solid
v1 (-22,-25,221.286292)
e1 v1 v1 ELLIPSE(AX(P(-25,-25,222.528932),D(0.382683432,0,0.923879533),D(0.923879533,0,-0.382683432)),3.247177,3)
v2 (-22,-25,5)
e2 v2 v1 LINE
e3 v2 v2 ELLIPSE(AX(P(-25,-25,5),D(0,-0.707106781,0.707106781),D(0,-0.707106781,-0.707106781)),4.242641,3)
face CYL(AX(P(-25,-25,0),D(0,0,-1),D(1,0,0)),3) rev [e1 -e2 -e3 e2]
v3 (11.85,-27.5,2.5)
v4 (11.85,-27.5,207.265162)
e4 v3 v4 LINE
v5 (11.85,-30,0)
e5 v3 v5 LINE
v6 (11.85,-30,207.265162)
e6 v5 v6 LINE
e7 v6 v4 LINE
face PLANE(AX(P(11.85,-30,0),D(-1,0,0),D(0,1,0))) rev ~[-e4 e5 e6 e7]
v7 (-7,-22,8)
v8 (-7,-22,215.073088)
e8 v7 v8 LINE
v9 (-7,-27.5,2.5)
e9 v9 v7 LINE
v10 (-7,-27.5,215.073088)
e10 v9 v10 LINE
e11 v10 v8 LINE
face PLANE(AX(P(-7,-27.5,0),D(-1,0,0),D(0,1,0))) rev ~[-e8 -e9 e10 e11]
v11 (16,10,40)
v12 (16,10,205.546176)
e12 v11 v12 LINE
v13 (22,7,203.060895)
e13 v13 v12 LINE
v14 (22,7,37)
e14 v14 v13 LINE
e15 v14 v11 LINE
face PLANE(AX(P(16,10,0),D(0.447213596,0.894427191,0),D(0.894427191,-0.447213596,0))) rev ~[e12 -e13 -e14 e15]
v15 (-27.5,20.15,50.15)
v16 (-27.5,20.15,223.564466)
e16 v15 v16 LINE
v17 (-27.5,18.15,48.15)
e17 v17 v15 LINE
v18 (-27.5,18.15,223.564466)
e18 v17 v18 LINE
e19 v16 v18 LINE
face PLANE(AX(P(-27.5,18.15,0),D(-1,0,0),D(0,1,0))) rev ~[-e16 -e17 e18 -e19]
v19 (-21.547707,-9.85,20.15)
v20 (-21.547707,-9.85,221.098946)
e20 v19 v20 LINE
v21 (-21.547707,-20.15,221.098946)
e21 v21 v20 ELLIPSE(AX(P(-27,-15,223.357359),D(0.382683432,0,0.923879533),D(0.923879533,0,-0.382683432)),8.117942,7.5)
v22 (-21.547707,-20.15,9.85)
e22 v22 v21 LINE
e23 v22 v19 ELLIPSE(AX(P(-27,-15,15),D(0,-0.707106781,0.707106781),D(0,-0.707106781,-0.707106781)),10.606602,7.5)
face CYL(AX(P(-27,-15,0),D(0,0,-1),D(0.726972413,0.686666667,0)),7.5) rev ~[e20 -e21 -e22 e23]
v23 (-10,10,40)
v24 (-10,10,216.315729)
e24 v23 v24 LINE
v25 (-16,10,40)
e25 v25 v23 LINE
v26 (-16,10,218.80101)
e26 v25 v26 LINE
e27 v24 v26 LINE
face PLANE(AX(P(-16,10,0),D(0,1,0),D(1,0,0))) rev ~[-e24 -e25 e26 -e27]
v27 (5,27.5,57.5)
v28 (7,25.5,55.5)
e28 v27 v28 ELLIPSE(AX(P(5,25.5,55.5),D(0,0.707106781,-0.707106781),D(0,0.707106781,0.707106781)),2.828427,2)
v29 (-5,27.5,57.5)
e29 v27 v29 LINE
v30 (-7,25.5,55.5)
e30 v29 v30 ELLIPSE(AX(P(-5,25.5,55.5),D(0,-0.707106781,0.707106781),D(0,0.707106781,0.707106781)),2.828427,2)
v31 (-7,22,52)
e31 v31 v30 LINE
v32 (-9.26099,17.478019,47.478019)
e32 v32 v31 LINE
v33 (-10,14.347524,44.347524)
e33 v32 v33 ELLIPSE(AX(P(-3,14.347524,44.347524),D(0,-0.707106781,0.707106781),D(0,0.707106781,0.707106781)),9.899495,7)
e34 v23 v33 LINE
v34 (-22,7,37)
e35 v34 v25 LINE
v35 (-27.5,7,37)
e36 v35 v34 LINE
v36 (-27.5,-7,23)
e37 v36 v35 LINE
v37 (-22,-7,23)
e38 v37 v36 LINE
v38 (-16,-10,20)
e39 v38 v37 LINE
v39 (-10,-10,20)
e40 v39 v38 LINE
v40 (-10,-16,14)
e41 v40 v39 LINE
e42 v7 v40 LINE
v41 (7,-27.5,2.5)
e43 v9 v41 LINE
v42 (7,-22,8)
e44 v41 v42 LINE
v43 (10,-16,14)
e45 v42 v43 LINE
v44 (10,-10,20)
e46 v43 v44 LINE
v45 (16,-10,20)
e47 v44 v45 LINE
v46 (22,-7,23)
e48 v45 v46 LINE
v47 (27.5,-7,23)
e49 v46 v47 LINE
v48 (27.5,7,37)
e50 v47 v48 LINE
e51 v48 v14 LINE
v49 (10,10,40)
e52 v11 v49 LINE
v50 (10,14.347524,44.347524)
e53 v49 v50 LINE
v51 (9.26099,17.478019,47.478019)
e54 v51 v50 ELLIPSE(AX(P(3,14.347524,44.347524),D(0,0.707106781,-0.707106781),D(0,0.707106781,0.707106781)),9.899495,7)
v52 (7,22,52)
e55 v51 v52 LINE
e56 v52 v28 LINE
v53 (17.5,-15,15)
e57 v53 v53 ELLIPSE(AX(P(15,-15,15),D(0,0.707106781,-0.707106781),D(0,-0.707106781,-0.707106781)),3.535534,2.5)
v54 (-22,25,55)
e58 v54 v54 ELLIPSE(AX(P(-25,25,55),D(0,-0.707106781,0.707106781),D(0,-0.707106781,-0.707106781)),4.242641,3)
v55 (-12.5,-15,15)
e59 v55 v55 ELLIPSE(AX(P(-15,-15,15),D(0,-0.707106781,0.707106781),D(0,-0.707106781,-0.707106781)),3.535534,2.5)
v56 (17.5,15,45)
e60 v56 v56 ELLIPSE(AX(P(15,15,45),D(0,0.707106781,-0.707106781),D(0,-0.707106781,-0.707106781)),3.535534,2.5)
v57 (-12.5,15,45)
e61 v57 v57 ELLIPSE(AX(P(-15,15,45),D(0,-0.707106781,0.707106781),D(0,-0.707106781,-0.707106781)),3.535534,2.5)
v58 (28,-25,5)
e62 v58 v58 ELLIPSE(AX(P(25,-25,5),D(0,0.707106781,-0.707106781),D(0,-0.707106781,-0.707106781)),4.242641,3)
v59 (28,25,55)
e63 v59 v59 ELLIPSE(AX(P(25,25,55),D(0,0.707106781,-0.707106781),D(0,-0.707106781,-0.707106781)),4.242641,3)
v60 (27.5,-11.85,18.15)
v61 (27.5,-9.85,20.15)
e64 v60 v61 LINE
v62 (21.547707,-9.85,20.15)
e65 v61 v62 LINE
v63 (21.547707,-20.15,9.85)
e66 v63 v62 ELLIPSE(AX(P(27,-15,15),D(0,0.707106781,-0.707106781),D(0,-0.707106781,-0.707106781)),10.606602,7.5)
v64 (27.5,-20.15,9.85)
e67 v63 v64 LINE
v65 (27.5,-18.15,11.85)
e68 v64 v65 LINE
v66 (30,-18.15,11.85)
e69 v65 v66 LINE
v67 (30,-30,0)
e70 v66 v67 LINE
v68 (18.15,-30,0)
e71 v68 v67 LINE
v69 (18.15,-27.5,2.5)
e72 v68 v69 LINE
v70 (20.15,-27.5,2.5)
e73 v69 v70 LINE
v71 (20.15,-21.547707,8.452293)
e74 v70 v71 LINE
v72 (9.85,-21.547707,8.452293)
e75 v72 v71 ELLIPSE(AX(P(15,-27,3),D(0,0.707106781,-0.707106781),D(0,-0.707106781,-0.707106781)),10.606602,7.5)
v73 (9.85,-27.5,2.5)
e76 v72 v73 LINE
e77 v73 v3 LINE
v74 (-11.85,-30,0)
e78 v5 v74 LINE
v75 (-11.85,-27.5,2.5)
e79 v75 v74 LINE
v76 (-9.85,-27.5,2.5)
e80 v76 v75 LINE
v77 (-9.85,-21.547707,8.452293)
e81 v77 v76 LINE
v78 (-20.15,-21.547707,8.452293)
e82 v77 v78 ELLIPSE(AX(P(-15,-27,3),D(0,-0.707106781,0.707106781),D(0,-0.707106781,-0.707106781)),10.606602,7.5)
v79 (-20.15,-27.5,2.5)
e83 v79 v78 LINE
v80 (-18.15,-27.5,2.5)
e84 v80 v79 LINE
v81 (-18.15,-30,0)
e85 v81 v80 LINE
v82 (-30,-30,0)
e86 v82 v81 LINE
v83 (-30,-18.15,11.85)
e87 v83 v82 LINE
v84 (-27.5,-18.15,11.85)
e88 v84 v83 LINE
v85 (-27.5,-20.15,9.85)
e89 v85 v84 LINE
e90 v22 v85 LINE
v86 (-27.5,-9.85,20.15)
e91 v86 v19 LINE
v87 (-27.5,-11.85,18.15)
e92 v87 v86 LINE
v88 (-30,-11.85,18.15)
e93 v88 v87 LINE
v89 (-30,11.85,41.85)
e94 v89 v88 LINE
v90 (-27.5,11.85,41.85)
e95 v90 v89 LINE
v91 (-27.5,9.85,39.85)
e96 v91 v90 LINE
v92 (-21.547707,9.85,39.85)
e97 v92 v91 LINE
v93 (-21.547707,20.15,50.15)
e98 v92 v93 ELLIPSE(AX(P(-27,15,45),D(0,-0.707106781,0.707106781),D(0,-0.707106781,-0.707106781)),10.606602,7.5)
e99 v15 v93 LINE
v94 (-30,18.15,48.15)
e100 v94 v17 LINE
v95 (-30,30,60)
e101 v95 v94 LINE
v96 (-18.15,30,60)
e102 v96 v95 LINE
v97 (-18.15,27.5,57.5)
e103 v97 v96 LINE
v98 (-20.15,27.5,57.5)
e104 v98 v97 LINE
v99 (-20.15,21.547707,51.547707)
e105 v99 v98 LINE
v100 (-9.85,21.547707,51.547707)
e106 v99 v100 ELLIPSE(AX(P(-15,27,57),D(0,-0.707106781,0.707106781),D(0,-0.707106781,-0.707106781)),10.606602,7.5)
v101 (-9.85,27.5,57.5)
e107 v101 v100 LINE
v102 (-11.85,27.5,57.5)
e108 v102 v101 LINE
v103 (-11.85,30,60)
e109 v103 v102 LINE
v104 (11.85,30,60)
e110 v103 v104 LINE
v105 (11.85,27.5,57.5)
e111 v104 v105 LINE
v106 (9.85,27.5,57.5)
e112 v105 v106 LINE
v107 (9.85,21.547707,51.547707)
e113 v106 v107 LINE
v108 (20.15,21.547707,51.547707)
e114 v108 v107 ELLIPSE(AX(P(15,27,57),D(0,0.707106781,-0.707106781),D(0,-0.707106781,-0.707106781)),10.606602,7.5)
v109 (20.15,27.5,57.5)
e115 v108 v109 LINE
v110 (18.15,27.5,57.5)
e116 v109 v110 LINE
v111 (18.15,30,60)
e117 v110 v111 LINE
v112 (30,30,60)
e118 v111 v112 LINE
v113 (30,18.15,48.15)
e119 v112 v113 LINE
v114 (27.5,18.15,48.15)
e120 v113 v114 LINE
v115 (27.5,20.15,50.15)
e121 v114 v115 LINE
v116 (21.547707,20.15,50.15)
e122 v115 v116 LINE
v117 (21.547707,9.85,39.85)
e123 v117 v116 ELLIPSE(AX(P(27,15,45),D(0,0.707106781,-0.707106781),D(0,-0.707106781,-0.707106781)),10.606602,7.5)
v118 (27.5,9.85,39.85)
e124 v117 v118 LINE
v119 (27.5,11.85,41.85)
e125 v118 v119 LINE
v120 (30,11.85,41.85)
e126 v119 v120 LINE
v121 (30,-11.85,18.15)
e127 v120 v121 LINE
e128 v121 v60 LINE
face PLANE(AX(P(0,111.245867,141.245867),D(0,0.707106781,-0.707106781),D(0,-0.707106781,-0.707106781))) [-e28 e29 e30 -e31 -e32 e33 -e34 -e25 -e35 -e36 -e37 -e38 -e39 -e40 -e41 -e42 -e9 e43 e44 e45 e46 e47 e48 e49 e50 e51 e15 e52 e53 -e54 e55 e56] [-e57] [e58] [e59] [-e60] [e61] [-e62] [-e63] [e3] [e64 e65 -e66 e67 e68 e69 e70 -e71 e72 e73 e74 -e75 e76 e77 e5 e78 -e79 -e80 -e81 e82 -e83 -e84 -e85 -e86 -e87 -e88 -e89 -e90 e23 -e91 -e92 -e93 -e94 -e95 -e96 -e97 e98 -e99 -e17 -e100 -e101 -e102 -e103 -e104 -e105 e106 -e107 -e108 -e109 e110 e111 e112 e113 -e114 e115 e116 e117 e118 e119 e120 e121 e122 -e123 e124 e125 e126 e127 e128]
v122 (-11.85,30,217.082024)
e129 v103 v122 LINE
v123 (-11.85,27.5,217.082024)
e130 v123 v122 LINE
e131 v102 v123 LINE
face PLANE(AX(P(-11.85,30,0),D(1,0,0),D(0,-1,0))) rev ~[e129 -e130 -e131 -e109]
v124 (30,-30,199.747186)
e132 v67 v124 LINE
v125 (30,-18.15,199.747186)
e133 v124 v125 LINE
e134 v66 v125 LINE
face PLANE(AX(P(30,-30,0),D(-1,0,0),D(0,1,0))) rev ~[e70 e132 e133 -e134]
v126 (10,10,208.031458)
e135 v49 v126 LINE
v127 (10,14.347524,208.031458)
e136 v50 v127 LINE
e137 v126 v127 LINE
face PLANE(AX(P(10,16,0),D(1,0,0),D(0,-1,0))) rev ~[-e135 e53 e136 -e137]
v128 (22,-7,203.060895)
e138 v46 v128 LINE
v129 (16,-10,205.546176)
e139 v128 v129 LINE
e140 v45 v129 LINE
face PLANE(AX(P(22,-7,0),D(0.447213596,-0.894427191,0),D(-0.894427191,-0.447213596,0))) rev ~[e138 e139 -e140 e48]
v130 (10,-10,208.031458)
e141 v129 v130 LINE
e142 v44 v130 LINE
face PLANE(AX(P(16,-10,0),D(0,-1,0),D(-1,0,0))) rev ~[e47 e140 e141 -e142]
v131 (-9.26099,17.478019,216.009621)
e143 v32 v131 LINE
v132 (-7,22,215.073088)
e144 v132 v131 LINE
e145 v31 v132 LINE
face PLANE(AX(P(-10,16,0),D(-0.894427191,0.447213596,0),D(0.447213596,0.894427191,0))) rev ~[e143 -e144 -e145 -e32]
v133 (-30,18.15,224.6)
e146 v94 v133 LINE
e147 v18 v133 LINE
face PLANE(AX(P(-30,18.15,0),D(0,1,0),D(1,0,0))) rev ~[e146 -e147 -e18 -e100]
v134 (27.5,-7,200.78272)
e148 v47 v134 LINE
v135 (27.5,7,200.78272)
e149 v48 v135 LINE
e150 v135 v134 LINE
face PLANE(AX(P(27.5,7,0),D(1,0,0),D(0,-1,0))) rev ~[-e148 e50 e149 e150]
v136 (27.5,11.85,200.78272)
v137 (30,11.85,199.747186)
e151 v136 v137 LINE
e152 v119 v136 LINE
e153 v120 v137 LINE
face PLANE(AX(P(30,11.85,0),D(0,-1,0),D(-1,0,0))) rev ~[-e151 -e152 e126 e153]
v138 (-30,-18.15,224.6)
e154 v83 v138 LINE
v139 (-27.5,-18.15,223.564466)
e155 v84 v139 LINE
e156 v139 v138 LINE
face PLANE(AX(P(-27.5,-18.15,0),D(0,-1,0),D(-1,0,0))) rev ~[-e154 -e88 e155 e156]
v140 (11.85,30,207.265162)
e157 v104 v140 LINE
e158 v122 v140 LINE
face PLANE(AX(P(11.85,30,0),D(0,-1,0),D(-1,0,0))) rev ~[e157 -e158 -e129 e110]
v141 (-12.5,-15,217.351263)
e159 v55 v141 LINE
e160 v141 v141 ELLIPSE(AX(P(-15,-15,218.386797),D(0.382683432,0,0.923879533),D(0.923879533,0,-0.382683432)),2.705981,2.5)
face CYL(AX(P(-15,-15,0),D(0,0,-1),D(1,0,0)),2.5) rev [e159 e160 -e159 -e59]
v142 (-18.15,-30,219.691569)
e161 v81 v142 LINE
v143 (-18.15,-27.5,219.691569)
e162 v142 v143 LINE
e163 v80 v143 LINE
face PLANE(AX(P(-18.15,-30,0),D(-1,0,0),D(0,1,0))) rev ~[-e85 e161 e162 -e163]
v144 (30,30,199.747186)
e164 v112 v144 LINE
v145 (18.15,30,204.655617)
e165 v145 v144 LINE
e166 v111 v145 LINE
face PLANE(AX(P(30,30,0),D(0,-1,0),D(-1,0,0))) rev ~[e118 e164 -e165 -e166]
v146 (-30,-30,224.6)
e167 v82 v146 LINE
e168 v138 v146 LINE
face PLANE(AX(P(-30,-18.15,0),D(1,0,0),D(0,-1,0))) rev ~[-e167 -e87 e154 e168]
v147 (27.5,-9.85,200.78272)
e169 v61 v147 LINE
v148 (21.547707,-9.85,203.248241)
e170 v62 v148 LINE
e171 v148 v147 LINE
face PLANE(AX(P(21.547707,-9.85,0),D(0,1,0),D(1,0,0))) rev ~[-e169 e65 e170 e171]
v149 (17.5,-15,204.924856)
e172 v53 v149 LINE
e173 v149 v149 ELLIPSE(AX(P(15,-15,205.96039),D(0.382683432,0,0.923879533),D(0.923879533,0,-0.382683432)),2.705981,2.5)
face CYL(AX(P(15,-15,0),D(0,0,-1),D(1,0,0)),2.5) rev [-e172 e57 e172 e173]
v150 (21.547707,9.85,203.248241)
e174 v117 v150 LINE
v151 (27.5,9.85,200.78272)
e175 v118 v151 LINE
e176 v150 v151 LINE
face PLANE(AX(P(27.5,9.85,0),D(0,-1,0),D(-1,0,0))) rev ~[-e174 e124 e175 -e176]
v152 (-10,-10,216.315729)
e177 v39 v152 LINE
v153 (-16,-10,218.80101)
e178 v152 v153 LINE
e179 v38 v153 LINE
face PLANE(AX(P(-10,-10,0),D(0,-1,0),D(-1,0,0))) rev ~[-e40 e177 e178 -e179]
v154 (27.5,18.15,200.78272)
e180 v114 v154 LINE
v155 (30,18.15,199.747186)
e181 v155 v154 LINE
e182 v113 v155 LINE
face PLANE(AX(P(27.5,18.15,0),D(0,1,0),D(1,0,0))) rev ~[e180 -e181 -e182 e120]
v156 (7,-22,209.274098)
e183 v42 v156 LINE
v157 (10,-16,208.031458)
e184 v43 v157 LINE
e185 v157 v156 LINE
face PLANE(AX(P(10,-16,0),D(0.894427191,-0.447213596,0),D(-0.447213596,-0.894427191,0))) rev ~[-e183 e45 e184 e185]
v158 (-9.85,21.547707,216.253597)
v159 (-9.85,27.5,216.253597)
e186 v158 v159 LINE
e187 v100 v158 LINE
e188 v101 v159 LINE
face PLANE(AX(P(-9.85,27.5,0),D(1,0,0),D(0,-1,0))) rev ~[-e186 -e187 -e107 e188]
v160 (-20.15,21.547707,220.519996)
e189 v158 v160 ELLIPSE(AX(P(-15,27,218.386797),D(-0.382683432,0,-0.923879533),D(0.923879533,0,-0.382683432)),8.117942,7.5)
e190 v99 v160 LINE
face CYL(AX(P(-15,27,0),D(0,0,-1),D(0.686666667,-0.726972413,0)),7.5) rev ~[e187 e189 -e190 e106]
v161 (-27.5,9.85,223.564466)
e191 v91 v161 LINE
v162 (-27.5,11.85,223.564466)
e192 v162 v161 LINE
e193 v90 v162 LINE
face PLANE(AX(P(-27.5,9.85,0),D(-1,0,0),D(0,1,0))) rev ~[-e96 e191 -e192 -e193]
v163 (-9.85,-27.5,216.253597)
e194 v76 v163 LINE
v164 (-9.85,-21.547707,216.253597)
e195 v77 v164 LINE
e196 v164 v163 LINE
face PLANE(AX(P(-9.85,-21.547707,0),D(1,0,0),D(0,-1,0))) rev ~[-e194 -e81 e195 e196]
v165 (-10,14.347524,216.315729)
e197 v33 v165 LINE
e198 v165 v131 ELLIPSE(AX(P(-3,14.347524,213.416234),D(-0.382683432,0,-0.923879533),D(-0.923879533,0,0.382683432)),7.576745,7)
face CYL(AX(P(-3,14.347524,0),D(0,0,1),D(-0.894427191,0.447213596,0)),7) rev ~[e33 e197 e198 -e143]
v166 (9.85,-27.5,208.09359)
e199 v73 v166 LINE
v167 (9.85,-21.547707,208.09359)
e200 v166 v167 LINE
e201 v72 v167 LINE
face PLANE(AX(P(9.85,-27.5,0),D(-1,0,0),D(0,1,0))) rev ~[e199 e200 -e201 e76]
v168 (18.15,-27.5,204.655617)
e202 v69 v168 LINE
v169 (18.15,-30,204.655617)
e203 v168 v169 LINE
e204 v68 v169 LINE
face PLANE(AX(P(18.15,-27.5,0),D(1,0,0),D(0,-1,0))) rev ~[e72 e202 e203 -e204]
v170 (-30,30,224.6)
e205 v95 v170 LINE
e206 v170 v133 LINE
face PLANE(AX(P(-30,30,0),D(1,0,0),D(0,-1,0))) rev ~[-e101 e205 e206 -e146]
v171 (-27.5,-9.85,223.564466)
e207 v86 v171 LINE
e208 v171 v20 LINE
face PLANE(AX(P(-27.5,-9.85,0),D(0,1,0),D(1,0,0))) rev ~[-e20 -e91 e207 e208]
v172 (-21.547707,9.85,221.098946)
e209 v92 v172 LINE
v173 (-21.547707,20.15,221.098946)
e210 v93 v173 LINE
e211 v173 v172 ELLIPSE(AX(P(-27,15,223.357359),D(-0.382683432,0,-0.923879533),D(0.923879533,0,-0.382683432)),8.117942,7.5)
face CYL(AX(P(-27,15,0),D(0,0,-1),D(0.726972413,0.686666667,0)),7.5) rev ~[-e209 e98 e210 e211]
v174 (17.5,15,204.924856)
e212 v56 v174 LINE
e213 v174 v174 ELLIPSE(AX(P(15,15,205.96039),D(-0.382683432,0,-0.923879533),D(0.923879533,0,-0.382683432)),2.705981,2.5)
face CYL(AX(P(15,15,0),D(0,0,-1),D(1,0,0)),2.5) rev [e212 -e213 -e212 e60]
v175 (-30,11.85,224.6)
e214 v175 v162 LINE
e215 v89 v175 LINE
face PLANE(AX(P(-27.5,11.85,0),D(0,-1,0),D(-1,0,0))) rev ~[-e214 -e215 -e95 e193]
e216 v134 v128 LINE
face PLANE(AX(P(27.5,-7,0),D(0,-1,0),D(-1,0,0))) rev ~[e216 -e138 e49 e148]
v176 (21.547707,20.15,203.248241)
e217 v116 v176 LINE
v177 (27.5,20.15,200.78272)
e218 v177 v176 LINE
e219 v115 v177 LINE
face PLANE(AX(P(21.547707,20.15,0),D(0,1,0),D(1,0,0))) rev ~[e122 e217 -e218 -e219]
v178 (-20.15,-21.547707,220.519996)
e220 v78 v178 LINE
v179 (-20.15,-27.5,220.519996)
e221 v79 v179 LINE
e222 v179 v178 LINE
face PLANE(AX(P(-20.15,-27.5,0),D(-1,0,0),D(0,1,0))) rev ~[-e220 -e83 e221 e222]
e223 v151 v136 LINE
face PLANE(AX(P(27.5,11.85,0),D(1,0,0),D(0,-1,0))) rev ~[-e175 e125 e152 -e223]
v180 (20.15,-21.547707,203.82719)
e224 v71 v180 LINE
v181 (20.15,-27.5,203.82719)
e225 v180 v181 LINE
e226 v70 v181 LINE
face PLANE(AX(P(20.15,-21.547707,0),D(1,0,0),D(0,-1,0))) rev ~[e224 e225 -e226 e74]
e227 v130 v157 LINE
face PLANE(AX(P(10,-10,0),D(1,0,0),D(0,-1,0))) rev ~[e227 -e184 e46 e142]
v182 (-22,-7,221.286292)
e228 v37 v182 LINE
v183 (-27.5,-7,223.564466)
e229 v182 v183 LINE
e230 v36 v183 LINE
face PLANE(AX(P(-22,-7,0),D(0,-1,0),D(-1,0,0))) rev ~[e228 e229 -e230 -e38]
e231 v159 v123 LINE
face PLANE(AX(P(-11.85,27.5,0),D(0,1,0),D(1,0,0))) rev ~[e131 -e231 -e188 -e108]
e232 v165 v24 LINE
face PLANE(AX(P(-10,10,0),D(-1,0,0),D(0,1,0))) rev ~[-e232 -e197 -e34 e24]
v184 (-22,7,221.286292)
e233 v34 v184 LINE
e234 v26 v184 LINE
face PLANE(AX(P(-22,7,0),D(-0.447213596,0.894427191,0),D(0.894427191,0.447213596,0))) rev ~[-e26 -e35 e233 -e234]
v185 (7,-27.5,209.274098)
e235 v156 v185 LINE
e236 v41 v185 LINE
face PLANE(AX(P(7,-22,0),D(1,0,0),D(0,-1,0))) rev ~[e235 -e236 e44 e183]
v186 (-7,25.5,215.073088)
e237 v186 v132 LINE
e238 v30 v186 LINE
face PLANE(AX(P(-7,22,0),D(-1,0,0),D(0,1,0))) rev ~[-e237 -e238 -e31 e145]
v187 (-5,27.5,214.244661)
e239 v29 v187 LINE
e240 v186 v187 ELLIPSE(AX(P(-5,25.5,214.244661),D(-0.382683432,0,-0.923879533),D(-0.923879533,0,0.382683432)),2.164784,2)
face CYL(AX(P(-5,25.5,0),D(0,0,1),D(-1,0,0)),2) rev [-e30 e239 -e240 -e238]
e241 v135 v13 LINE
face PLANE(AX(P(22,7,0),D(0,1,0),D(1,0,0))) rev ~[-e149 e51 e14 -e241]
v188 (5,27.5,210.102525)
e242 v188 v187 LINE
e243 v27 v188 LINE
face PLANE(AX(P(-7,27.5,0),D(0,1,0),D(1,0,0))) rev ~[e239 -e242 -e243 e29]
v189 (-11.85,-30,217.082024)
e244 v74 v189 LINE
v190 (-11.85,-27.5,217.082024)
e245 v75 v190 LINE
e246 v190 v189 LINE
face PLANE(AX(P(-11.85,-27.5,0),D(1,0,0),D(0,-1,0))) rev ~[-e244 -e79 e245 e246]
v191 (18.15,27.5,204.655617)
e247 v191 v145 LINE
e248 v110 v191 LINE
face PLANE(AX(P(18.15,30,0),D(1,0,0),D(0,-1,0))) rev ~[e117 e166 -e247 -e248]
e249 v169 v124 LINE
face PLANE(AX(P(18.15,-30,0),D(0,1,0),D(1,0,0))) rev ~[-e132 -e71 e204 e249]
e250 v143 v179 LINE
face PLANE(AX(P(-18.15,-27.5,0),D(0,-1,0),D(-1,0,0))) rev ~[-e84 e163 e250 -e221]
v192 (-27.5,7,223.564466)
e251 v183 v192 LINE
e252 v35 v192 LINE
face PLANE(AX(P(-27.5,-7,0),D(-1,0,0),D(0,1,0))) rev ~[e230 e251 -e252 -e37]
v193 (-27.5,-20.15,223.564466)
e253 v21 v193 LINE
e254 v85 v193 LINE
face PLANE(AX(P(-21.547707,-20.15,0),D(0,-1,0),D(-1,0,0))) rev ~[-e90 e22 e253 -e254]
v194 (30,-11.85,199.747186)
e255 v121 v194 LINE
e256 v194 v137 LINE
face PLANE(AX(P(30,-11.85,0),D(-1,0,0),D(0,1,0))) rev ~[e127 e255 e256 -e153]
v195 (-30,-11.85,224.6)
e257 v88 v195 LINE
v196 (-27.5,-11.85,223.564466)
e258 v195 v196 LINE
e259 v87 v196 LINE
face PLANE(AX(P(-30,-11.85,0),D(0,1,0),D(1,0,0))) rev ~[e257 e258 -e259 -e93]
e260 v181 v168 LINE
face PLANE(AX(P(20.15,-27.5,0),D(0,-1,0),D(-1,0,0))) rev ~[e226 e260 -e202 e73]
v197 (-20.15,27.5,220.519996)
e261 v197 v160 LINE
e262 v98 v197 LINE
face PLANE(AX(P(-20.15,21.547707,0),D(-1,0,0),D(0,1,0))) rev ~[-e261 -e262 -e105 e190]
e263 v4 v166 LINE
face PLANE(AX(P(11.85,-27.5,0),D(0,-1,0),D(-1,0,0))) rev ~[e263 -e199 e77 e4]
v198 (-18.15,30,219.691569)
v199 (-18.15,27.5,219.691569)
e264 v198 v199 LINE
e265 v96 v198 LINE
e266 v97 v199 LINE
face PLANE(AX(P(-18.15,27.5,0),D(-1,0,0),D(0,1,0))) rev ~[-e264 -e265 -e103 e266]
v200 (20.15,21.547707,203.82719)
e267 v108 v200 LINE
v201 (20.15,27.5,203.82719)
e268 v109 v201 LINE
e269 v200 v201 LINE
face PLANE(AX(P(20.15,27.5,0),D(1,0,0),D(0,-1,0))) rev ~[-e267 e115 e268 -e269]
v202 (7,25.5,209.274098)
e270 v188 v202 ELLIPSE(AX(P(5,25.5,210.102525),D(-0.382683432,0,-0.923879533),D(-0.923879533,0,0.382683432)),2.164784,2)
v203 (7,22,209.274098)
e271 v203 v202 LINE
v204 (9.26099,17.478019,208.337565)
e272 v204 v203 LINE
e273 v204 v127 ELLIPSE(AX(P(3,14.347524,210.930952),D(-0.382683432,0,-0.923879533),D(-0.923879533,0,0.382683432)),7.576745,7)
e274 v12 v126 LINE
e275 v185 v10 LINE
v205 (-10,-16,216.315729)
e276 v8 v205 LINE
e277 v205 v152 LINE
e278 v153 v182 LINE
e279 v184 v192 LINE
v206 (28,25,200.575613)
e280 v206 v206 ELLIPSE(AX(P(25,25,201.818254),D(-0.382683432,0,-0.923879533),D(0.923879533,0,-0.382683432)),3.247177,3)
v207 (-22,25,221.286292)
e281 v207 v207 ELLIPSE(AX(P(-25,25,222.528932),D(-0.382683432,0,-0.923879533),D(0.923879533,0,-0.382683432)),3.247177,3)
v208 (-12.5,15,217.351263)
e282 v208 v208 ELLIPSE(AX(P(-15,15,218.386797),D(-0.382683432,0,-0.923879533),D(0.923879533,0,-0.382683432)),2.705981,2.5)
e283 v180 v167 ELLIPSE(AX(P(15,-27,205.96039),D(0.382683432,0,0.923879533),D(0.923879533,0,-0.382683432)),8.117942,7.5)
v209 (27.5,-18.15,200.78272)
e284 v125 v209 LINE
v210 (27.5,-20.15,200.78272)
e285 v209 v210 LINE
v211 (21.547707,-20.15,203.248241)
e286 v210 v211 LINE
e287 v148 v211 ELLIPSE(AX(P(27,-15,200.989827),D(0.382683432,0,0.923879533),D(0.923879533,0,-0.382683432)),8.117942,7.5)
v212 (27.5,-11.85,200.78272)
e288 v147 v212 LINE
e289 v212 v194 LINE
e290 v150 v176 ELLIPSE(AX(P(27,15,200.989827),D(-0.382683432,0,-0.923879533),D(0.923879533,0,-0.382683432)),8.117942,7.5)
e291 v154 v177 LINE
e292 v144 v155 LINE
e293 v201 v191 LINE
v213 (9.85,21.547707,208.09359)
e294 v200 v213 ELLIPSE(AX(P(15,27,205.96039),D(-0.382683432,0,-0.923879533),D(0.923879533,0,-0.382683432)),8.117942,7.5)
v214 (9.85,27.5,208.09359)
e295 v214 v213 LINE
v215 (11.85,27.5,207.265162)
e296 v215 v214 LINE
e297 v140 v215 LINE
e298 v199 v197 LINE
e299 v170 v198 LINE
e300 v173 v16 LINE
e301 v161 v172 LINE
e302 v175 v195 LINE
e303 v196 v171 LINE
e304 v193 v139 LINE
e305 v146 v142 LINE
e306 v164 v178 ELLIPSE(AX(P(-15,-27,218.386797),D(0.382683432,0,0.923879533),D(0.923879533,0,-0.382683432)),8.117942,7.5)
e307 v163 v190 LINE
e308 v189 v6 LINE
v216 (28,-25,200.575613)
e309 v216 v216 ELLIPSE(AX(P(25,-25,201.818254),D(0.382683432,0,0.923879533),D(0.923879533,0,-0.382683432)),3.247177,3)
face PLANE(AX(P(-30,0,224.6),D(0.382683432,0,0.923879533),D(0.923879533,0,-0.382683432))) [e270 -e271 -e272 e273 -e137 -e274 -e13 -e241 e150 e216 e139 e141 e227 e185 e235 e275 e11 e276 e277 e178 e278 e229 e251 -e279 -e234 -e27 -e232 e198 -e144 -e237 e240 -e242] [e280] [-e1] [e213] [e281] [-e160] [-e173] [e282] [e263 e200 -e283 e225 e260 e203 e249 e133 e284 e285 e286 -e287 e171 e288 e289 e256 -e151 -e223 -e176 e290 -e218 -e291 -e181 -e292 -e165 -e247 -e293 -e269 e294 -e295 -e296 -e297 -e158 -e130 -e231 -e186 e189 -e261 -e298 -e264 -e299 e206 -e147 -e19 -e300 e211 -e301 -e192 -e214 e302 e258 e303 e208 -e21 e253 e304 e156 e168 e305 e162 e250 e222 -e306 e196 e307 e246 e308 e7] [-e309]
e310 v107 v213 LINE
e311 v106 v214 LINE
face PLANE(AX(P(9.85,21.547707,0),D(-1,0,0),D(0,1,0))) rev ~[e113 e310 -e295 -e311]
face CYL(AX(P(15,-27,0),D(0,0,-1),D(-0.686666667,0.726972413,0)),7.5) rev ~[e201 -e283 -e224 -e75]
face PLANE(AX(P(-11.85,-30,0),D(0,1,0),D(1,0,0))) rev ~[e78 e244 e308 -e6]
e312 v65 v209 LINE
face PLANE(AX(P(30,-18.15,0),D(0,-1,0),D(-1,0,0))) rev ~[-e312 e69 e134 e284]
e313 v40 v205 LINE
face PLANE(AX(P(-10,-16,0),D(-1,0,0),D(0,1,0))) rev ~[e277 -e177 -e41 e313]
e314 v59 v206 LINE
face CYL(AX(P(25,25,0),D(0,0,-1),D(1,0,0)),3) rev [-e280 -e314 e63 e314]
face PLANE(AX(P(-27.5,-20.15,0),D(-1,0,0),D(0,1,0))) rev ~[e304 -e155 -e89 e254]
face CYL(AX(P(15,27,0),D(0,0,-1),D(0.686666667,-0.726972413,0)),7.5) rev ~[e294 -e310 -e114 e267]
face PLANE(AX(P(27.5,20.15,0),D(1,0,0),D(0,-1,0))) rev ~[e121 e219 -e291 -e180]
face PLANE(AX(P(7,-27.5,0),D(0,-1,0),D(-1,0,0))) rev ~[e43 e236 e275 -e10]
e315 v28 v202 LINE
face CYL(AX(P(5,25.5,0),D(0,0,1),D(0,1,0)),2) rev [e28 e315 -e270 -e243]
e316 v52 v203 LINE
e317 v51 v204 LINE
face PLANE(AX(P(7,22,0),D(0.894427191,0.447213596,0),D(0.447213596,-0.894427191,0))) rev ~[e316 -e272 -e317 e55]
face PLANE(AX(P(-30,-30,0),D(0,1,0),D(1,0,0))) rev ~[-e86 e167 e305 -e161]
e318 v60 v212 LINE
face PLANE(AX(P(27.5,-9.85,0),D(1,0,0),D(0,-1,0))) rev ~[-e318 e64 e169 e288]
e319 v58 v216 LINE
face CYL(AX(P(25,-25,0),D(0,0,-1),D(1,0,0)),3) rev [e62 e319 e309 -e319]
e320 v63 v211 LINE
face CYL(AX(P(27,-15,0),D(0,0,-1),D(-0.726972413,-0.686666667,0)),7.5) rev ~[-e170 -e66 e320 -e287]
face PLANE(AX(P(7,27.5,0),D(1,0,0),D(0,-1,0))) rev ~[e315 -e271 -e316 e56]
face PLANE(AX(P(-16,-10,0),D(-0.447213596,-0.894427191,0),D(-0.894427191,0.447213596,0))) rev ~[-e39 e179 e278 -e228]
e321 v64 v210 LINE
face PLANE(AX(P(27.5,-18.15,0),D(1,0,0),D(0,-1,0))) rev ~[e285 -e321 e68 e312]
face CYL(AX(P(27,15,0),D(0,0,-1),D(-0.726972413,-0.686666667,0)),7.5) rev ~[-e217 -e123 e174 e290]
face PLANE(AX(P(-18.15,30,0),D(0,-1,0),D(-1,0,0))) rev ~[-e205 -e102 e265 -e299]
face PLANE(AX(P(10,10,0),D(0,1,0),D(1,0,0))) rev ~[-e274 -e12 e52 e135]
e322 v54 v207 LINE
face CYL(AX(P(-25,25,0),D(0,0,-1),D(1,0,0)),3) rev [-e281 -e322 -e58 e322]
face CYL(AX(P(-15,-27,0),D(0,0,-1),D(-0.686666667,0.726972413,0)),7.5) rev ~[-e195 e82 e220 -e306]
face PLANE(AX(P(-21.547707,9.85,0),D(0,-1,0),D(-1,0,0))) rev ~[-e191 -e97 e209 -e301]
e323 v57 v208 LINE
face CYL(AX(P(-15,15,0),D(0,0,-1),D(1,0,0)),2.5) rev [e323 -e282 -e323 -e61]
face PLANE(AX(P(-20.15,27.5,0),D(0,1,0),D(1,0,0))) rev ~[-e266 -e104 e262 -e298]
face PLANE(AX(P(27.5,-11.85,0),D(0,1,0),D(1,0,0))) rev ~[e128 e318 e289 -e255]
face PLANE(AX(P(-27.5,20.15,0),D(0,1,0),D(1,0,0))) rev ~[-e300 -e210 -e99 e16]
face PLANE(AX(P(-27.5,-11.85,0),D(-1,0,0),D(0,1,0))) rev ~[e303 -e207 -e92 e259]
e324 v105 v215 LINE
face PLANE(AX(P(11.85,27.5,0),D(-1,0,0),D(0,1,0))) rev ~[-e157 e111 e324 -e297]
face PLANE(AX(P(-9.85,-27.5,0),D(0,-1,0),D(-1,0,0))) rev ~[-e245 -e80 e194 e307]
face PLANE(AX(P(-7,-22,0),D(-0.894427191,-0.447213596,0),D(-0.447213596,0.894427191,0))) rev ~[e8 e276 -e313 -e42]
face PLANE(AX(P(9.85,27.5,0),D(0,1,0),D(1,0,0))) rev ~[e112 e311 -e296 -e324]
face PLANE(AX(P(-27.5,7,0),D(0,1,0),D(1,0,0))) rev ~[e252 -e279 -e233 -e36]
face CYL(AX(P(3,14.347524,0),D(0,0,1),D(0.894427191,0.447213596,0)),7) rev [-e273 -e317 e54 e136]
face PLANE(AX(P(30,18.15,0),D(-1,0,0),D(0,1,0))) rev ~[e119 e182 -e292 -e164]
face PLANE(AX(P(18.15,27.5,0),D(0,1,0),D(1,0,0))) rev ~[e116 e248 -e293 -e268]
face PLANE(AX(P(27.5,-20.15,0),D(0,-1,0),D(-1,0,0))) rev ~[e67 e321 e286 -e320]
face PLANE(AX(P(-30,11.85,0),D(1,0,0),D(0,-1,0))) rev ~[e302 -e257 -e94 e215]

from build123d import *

# Parameters (mm, degrees)
F0_R          = 3
F0_R_2        = 2.5
F1_DEPTH      = 224.6
F2_R          = 2
F3_R          = 7
F6_DEPTH      = 30
F6_DEPTH_BACK = 30
F8_DEPTH      = 30
F8_DEPTH_BACK = 30


# Not quite as in the source:
# - a feature names something its author has since deleted; it is built from what else it names


with BuildPart() as f1:
    # F0 (on Top) → F1 (new body)
    with BuildSketch(Plane.XY):
        with BuildLine():
            Line((18.15, -30), (30, -30))
            Line((30, -30), (30, -18.15))
            Line((30, -18.15), (27.5, -18.15))
            Line((27.5, -18.15), (27.5, -20.15))
            Line((27.5, -20.15), (21.5477069044, -20.15))
            ThreePointArc((21.5477069044, -20.15), (19.5, -15), (21.5477069044, -9.85))
            Line((21.5477069044, -9.85), (27.5, -9.85))
            Line((27.5, -9.85), (27.5, -11.85))
            Line((27.5, -11.85), (30, -11.85))
            Line((30, -11.85), (30, 11.85))
            Line((30, 11.85), (27.5, 11.85))
            Line((27.5, 11.85), (27.5, 9.85))
            Line((27.5, 9.85), (21.5477069044, 9.85))
            ThreePointArc((21.5477069044, 9.85), (19.5, 15), (21.5477069044, 20.15))
            Line((21.5477069044, 20.15), (27.5, 20.15))
            Line((27.5, 20.15), (27.5, 18.15))
            Line((27.5, 18.15), (30, 18.15))
            Line((30, 18.15), (30, 30))
            Line((30, 30), (18.15, 30))
            Line((18.15, 30), (18.15, 27.5))
            Line((18.15, 27.5), (20.15, 27.5))
            Line((20.15, 27.5), (20.15, 21.5477069044))
            ThreePointArc((20.15, 21.5477069044), (15, 19.5), (9.85, 21.5477069044))
            Line((9.85, 21.5477069044), (9.85, 27.5))
            Line((9.85, 27.5), (11.85, 27.5))
            Line((11.85, 27.5), (11.85, 30))
            Line((11.85, 30), (-11.85, 30))
            Line((-11.85, 30), (-11.85, 27.5))
            Line((-11.85, 27.5), (-9.85, 27.5))
            Line((-9.85, 27.5), (-9.85, 21.5477069044))
            ThreePointArc((-9.85, 21.5477069044), (-15, 19.5), (-20.15, 21.5477069044))
            Line((-20.15, 21.5477069044), (-20.15, 27.5))
            Line((-20.15, 27.5), (-18.15, 27.5))
            Line((-18.15, 27.5), (-18.15, 30))
            Line((-18.15, 30), (-30, 30))
            Line((-30, 30), (-30, 18.15))
            Line((-30, 18.15), (-27.5, 18.15))
            Line((-27.5, 18.15), (-27.5, 20.15))
            Line((-27.5, 20.15), (-21.5477069044, 20.15))
            ThreePointArc((-21.5477069044, 20.15), (-19.5, 15), (-21.5477069044, 9.85))
            Line((-21.5477069044, 9.85), (-27.5, 9.85))
            Line((-27.5, 9.85), (-27.5, 11.85))
            Line((-27.5, 11.85), (-30, 11.85))
            Line((-30, 11.85), (-30, -11.85))
            Line((-30, -11.85), (-27.5, -11.85))
            Line((-27.5, -11.85), (-27.5, -9.85))
            Line((-27.5, -9.85), (-21.5477069044, -9.85))
            ThreePointArc((-21.5477069044, -9.85), (-19.5, -15), (-21.5477069044, -20.15))
            Line((-21.5477069044, -20.15), (-27.5, -20.15))
            Line((-27.5, -20.15), (-27.5, -18.15))
            Line((-27.5, -18.15), (-30, -18.15))
            Line((-30, -18.15), (-30, -30))
            Line((-30, -30), (-18.15, -30))
            Line((-18.15, -30), (-18.15, -27.5))
            Line((-18.15, -27.5), (-20.15, -27.5))
            Line((-20.15, -27.5), (-20.15, -21.5477069044))
            ThreePointArc((-20.15, -21.5477069044), (-15, -19.5), (-9.85, -21.5477069044))
            Line((-9.85, -21.5477069044), (-9.85, -27.5))
            Line((-9.85, -27.5), (-11.85, -27.5))
            Line((-11.85, -27.5), (-11.85, -30))
            Line((-11.85, -30), (11.85, -30))
            Line((11.85, -30), (11.85, -27.5))
            Line((11.85, -27.5), (9.85, -27.5))
            Line((9.85, -27.5), (9.85, -21.5477069044))
            ThreePointArc((9.85, -21.5477069044), (15, -19.5), (20.15, -21.5477069044))
            Line((20.15, -21.5477069044), (20.15, -27.5))
            Line((20.15, -27.5), (18.15, -27.5))
            Line((18.15, -27.5), (18.15, -30))
        make_face()
        with Locations((-25, -25)):
            Circle(F0_R, mode=Mode.SUBTRACT)
        with Locations((-15, -15)):
            Circle(F0_R_2, mode=Mode.SUBTRACT)
        with Locations((25, -25)):
            Circle(F0_R, mode=Mode.SUBTRACT)
        with Locations((15, -15)):
            Circle(F0_R_2, mode=Mode.SUBTRACT)
        with Locations((-25, 25)):
            Circle(F0_R, mode=Mode.SUBTRACT)
        with Locations((-15, 15)):
            Circle(F0_R_2, mode=Mode.SUBTRACT)
        Polygon((-7, 22), (-7, 27.5), (0, 27.5), (7, 27.5), (7, 22), (10, 16), (10, 10), (16, 10), (22, 7), (27.5, 7), (27.5, 0), (27.5, -7), (22, -7), (16, -10), (10, -10), (10, -16), (7, -22), (7, -27.5), (0, -27.5), (-7, -27.5), (-7, -22), (-10, -16), (-10, -10), (-16, -10), (-22, -7), (-27.5, -7), (-27.5, 0), (-27.5, 7), (-22, 7), (-16, 10), (-10, 10), (-10, 16), align=None, mode=Mode.SUBTRACT)
        with Locations((15, 15)):
            Circle(F0_R_2, mode=Mode.SUBTRACT)
        with Locations((25, 25)):
            Circle(F0_R, mode=Mode.SUBTRACT)
    extrude(amount=F1_DEPTH)

    # F2
    f2_edges = [f1.edges().sort_by_distance(p)[0] for p in [
        (-7, 27.5, 112.3),
        (7, 27.5, 112.3),
    ]]
    fillet(f2_edges, radius=F2_R)

    # F3
    f3_edges = [f1.edges().sort_by_distance(p)[0] for p in [
        (-10, 16, 112.3),
        (10, 16, 112.3),
    ]]
    fillet(f3_edges, radius=F3_R)

    # F5 (on Right) → F6 (cut, two sides)
    with BuildSketch(Plane.YZ) as f6_sk:
        Polygon((70.3932136338, -100.3932136338), (211.6390804038, 40.8526531362), (111.24586677, 141.24586677), (-30, 0), align=None)
    extrude(amount=-F6_DEPTH, mode=Mode.SUBTRACT)
    extrude(f6_sk.sketch, amount=F6_DEPTH_BACK, mode=Mode.SUBTRACT)

    # F7 (on Front) → F8 (cut, two sides)
    with BuildSketch(Plane.XZ) as f8_sk:
        Polygon((136.0873846676, 331.4359196356), (32.0951359741, 374.5109194261), (-30, 224.6), (73.9922486935, 181.5250002095), align=None)
    extrude(amount=F8_DEPTH, mode=Mode.SUBTRACT)
    extrude(f8_sk.sketch, amount=-F8_DEPTH_BACK, mode=Mode.SUBTRACT)


solid = f1.part
